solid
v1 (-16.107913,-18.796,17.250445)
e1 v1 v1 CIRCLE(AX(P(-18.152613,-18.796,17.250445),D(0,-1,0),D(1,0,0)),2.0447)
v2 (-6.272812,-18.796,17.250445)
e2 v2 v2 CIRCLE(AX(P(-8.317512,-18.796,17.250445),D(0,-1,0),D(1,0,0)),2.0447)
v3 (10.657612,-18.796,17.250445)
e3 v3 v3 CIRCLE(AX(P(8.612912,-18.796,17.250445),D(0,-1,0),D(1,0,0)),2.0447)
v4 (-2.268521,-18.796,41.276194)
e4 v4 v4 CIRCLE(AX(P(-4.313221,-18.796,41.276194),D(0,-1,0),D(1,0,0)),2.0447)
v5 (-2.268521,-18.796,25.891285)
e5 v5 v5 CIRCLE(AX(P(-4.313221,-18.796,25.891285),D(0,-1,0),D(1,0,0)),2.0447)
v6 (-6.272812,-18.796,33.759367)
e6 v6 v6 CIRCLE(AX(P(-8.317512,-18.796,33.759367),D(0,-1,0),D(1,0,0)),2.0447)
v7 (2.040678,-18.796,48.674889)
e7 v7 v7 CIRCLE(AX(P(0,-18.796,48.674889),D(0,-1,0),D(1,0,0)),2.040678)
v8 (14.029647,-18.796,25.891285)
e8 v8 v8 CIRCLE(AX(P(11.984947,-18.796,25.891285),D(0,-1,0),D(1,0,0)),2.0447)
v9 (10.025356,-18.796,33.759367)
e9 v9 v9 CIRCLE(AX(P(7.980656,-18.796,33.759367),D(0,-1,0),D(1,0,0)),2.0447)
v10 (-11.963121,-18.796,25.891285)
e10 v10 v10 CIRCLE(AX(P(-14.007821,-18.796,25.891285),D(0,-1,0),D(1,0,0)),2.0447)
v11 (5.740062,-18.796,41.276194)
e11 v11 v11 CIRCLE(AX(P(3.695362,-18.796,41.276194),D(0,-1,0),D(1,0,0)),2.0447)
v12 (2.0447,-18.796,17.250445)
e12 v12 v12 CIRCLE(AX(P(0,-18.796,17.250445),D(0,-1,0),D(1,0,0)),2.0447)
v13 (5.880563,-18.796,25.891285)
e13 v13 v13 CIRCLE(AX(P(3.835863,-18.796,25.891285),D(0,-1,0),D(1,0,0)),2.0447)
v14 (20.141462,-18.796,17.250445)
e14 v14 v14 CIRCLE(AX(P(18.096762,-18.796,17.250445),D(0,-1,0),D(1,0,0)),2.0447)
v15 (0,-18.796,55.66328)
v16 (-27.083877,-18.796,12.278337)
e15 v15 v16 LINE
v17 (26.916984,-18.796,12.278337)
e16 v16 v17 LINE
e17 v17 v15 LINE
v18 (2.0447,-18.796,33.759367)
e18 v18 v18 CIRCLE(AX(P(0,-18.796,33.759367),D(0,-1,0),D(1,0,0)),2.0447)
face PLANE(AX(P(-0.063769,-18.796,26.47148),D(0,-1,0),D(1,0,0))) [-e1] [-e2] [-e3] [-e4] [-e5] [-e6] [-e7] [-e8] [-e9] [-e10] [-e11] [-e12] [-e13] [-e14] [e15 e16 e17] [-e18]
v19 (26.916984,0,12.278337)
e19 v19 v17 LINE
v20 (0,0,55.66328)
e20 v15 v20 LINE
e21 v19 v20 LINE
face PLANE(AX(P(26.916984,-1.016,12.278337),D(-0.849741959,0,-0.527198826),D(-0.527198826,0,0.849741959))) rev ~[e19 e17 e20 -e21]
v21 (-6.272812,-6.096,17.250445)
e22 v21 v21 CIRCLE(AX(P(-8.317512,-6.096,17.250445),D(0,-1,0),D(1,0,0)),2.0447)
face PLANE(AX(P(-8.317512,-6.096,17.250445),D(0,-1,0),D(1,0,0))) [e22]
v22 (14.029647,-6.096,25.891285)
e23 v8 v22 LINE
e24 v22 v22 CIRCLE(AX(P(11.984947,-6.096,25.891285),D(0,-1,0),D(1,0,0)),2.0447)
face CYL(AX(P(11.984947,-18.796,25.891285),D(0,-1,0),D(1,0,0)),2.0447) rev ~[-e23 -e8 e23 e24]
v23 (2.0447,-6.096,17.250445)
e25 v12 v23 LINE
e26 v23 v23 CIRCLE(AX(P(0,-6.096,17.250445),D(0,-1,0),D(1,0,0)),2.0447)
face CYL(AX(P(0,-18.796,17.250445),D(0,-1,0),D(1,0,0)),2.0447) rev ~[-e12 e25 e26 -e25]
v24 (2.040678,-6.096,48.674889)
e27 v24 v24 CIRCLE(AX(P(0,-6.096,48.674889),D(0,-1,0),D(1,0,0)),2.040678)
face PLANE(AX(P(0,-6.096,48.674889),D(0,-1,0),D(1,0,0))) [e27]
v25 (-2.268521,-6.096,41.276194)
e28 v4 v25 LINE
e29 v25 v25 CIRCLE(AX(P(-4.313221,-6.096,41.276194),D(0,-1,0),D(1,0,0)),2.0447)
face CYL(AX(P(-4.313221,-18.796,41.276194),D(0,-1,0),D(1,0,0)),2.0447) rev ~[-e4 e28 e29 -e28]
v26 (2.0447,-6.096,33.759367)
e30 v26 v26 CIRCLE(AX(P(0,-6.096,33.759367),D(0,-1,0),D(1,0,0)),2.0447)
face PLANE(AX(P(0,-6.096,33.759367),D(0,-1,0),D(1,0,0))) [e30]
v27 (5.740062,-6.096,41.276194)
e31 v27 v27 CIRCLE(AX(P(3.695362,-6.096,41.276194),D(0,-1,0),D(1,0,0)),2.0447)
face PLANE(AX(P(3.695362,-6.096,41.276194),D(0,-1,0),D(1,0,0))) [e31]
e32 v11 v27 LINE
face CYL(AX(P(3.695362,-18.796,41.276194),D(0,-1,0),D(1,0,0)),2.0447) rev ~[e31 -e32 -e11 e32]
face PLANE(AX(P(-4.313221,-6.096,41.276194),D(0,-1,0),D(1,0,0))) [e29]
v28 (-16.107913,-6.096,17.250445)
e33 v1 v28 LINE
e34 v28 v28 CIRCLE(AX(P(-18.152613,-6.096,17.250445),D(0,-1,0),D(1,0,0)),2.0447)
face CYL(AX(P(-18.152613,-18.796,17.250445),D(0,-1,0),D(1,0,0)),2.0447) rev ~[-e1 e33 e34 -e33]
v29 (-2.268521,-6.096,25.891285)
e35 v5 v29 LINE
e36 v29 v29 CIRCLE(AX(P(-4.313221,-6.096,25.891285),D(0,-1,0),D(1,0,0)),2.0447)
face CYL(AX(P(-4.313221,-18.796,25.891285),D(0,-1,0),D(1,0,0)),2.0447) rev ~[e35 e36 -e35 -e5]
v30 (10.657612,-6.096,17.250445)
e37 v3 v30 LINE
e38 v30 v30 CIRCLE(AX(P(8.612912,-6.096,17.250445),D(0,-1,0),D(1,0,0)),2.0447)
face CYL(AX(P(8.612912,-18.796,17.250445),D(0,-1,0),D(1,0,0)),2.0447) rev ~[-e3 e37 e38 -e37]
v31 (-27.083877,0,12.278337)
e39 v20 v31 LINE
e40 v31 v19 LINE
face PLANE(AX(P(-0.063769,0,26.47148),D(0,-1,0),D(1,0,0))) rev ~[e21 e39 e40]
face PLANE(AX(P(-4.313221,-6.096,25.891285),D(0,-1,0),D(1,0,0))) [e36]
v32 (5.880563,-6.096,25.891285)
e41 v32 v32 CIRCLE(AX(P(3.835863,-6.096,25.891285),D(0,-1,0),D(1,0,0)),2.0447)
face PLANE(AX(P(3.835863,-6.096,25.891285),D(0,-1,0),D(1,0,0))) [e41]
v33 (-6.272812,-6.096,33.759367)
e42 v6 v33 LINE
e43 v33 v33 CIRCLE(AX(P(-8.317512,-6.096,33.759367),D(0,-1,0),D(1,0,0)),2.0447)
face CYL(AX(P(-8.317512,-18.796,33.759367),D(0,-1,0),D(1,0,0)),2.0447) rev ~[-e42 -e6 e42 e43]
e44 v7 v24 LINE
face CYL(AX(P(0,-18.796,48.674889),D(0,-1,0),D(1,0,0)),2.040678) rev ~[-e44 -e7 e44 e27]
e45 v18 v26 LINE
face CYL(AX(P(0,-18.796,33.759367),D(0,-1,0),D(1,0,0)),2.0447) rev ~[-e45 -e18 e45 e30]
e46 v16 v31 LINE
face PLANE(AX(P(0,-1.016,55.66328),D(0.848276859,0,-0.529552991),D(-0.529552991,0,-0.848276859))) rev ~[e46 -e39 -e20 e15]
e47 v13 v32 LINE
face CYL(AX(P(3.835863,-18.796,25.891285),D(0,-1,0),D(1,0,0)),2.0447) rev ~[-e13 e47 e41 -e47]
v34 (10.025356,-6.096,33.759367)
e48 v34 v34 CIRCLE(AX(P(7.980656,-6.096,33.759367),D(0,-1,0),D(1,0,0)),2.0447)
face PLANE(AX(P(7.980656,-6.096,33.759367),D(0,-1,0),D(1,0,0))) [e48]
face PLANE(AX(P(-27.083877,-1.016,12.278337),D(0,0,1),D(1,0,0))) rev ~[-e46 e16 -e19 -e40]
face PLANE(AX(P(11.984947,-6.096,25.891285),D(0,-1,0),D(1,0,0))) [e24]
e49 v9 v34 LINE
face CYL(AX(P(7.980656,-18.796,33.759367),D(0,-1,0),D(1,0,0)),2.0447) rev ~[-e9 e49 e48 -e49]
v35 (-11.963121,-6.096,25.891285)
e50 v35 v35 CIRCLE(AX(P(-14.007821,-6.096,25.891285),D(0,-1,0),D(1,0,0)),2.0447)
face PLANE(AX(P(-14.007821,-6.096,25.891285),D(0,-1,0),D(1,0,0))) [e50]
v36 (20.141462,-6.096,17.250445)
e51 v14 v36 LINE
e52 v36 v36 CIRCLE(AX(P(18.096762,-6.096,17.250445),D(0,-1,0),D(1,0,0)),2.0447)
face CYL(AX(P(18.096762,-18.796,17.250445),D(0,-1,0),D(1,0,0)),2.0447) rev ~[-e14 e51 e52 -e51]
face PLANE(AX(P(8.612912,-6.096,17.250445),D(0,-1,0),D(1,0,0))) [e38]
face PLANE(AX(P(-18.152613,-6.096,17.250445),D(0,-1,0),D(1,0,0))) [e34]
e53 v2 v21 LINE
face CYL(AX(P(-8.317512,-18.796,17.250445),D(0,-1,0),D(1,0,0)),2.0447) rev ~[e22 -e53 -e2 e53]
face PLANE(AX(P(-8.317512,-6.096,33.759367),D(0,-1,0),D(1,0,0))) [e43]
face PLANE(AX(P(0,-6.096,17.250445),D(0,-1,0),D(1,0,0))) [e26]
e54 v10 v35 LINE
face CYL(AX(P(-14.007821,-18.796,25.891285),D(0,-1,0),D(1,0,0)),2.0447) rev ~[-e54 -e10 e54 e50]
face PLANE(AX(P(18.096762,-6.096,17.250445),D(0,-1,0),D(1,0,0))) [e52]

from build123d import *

# Parameters (mm, degrees)
F1_DEPTH = 1.016
F2_DEPTH = 17.78
F3_R     = 2.0447
F3_R_2   = 2.0406784107
F4_DEPTH = 12.7


# Not quite as in the source:
# - a feature names something its author has since deleted; it is built from what else it names


with BuildPart() as f1:
    # F0 (on Front) → F1 (new body)
    with BuildSketch(Plane.XZ):
        Polygon((-27.083877352, 12.2783370181), (26.9169844677, 12.2783370181), (0, 55.663280189), align=None)
    extrude(amount=F1_DEPTH)

    # F2 (add): a face of the model
    f2_faces = [f1.faces().sort_by_distance(p)[0] for p in [
        (-0.0556309614, -1.016, 26.7399847417),
    ]]
    extrude(f2_faces, amount=F2_DEPTH)

    # F3 (on face) → F4 (cut)
    with BuildSketch(Plane.XZ.offset(18.796)):
        with Locations((3.6953620147, 41.2761941552)):
            Circle(F3_R)
        with Locations((0, 48.6748889089)):
            Circle(F3_R_2)
        with Locations((-4.3132207356, 41.2761941552)):
            Circle(F3_R)
        with Locations((0, 33.7593667209)):
            Circle(F3_R)
        with Locations((7.9806558788, 33.7593667209)):
            Circle(F3_R)
        with Locations((-8.3175115287, 33.7593667209)):
            Circle(F3_R)
        with Locations((-4.3132207356, 25.8912853897)):
            Circle(F3_R)
        with Locations((-14.0078207478, 25.8912853897)):
            Circle(F3_R)
        with Locations((3.8358634338, 25.8912853897)):
            Circle(F3_R)
        with Locations((11.9849471375, 25.8912853897)):
            Circle(F3_R)
        with Locations((18.096761778, 17.2504447401)):
            Circle(F3_R)
        with Locations((8.6129121482, 17.2504447401)):
            Circle(F3_R)
        with Locations((0, 17.2504447401)):
            Circle(F3_R)
        with Locations((-8.3175115287, 17.2504447401)):
            Circle(F3_R)
        with Locations((-18.1526131928, 17.2504447401)):
            Circle(F3_R)
    extrude(amount=-F4_DEPTH, mode=Mode.SUBTRACT)


solid = f1.part
